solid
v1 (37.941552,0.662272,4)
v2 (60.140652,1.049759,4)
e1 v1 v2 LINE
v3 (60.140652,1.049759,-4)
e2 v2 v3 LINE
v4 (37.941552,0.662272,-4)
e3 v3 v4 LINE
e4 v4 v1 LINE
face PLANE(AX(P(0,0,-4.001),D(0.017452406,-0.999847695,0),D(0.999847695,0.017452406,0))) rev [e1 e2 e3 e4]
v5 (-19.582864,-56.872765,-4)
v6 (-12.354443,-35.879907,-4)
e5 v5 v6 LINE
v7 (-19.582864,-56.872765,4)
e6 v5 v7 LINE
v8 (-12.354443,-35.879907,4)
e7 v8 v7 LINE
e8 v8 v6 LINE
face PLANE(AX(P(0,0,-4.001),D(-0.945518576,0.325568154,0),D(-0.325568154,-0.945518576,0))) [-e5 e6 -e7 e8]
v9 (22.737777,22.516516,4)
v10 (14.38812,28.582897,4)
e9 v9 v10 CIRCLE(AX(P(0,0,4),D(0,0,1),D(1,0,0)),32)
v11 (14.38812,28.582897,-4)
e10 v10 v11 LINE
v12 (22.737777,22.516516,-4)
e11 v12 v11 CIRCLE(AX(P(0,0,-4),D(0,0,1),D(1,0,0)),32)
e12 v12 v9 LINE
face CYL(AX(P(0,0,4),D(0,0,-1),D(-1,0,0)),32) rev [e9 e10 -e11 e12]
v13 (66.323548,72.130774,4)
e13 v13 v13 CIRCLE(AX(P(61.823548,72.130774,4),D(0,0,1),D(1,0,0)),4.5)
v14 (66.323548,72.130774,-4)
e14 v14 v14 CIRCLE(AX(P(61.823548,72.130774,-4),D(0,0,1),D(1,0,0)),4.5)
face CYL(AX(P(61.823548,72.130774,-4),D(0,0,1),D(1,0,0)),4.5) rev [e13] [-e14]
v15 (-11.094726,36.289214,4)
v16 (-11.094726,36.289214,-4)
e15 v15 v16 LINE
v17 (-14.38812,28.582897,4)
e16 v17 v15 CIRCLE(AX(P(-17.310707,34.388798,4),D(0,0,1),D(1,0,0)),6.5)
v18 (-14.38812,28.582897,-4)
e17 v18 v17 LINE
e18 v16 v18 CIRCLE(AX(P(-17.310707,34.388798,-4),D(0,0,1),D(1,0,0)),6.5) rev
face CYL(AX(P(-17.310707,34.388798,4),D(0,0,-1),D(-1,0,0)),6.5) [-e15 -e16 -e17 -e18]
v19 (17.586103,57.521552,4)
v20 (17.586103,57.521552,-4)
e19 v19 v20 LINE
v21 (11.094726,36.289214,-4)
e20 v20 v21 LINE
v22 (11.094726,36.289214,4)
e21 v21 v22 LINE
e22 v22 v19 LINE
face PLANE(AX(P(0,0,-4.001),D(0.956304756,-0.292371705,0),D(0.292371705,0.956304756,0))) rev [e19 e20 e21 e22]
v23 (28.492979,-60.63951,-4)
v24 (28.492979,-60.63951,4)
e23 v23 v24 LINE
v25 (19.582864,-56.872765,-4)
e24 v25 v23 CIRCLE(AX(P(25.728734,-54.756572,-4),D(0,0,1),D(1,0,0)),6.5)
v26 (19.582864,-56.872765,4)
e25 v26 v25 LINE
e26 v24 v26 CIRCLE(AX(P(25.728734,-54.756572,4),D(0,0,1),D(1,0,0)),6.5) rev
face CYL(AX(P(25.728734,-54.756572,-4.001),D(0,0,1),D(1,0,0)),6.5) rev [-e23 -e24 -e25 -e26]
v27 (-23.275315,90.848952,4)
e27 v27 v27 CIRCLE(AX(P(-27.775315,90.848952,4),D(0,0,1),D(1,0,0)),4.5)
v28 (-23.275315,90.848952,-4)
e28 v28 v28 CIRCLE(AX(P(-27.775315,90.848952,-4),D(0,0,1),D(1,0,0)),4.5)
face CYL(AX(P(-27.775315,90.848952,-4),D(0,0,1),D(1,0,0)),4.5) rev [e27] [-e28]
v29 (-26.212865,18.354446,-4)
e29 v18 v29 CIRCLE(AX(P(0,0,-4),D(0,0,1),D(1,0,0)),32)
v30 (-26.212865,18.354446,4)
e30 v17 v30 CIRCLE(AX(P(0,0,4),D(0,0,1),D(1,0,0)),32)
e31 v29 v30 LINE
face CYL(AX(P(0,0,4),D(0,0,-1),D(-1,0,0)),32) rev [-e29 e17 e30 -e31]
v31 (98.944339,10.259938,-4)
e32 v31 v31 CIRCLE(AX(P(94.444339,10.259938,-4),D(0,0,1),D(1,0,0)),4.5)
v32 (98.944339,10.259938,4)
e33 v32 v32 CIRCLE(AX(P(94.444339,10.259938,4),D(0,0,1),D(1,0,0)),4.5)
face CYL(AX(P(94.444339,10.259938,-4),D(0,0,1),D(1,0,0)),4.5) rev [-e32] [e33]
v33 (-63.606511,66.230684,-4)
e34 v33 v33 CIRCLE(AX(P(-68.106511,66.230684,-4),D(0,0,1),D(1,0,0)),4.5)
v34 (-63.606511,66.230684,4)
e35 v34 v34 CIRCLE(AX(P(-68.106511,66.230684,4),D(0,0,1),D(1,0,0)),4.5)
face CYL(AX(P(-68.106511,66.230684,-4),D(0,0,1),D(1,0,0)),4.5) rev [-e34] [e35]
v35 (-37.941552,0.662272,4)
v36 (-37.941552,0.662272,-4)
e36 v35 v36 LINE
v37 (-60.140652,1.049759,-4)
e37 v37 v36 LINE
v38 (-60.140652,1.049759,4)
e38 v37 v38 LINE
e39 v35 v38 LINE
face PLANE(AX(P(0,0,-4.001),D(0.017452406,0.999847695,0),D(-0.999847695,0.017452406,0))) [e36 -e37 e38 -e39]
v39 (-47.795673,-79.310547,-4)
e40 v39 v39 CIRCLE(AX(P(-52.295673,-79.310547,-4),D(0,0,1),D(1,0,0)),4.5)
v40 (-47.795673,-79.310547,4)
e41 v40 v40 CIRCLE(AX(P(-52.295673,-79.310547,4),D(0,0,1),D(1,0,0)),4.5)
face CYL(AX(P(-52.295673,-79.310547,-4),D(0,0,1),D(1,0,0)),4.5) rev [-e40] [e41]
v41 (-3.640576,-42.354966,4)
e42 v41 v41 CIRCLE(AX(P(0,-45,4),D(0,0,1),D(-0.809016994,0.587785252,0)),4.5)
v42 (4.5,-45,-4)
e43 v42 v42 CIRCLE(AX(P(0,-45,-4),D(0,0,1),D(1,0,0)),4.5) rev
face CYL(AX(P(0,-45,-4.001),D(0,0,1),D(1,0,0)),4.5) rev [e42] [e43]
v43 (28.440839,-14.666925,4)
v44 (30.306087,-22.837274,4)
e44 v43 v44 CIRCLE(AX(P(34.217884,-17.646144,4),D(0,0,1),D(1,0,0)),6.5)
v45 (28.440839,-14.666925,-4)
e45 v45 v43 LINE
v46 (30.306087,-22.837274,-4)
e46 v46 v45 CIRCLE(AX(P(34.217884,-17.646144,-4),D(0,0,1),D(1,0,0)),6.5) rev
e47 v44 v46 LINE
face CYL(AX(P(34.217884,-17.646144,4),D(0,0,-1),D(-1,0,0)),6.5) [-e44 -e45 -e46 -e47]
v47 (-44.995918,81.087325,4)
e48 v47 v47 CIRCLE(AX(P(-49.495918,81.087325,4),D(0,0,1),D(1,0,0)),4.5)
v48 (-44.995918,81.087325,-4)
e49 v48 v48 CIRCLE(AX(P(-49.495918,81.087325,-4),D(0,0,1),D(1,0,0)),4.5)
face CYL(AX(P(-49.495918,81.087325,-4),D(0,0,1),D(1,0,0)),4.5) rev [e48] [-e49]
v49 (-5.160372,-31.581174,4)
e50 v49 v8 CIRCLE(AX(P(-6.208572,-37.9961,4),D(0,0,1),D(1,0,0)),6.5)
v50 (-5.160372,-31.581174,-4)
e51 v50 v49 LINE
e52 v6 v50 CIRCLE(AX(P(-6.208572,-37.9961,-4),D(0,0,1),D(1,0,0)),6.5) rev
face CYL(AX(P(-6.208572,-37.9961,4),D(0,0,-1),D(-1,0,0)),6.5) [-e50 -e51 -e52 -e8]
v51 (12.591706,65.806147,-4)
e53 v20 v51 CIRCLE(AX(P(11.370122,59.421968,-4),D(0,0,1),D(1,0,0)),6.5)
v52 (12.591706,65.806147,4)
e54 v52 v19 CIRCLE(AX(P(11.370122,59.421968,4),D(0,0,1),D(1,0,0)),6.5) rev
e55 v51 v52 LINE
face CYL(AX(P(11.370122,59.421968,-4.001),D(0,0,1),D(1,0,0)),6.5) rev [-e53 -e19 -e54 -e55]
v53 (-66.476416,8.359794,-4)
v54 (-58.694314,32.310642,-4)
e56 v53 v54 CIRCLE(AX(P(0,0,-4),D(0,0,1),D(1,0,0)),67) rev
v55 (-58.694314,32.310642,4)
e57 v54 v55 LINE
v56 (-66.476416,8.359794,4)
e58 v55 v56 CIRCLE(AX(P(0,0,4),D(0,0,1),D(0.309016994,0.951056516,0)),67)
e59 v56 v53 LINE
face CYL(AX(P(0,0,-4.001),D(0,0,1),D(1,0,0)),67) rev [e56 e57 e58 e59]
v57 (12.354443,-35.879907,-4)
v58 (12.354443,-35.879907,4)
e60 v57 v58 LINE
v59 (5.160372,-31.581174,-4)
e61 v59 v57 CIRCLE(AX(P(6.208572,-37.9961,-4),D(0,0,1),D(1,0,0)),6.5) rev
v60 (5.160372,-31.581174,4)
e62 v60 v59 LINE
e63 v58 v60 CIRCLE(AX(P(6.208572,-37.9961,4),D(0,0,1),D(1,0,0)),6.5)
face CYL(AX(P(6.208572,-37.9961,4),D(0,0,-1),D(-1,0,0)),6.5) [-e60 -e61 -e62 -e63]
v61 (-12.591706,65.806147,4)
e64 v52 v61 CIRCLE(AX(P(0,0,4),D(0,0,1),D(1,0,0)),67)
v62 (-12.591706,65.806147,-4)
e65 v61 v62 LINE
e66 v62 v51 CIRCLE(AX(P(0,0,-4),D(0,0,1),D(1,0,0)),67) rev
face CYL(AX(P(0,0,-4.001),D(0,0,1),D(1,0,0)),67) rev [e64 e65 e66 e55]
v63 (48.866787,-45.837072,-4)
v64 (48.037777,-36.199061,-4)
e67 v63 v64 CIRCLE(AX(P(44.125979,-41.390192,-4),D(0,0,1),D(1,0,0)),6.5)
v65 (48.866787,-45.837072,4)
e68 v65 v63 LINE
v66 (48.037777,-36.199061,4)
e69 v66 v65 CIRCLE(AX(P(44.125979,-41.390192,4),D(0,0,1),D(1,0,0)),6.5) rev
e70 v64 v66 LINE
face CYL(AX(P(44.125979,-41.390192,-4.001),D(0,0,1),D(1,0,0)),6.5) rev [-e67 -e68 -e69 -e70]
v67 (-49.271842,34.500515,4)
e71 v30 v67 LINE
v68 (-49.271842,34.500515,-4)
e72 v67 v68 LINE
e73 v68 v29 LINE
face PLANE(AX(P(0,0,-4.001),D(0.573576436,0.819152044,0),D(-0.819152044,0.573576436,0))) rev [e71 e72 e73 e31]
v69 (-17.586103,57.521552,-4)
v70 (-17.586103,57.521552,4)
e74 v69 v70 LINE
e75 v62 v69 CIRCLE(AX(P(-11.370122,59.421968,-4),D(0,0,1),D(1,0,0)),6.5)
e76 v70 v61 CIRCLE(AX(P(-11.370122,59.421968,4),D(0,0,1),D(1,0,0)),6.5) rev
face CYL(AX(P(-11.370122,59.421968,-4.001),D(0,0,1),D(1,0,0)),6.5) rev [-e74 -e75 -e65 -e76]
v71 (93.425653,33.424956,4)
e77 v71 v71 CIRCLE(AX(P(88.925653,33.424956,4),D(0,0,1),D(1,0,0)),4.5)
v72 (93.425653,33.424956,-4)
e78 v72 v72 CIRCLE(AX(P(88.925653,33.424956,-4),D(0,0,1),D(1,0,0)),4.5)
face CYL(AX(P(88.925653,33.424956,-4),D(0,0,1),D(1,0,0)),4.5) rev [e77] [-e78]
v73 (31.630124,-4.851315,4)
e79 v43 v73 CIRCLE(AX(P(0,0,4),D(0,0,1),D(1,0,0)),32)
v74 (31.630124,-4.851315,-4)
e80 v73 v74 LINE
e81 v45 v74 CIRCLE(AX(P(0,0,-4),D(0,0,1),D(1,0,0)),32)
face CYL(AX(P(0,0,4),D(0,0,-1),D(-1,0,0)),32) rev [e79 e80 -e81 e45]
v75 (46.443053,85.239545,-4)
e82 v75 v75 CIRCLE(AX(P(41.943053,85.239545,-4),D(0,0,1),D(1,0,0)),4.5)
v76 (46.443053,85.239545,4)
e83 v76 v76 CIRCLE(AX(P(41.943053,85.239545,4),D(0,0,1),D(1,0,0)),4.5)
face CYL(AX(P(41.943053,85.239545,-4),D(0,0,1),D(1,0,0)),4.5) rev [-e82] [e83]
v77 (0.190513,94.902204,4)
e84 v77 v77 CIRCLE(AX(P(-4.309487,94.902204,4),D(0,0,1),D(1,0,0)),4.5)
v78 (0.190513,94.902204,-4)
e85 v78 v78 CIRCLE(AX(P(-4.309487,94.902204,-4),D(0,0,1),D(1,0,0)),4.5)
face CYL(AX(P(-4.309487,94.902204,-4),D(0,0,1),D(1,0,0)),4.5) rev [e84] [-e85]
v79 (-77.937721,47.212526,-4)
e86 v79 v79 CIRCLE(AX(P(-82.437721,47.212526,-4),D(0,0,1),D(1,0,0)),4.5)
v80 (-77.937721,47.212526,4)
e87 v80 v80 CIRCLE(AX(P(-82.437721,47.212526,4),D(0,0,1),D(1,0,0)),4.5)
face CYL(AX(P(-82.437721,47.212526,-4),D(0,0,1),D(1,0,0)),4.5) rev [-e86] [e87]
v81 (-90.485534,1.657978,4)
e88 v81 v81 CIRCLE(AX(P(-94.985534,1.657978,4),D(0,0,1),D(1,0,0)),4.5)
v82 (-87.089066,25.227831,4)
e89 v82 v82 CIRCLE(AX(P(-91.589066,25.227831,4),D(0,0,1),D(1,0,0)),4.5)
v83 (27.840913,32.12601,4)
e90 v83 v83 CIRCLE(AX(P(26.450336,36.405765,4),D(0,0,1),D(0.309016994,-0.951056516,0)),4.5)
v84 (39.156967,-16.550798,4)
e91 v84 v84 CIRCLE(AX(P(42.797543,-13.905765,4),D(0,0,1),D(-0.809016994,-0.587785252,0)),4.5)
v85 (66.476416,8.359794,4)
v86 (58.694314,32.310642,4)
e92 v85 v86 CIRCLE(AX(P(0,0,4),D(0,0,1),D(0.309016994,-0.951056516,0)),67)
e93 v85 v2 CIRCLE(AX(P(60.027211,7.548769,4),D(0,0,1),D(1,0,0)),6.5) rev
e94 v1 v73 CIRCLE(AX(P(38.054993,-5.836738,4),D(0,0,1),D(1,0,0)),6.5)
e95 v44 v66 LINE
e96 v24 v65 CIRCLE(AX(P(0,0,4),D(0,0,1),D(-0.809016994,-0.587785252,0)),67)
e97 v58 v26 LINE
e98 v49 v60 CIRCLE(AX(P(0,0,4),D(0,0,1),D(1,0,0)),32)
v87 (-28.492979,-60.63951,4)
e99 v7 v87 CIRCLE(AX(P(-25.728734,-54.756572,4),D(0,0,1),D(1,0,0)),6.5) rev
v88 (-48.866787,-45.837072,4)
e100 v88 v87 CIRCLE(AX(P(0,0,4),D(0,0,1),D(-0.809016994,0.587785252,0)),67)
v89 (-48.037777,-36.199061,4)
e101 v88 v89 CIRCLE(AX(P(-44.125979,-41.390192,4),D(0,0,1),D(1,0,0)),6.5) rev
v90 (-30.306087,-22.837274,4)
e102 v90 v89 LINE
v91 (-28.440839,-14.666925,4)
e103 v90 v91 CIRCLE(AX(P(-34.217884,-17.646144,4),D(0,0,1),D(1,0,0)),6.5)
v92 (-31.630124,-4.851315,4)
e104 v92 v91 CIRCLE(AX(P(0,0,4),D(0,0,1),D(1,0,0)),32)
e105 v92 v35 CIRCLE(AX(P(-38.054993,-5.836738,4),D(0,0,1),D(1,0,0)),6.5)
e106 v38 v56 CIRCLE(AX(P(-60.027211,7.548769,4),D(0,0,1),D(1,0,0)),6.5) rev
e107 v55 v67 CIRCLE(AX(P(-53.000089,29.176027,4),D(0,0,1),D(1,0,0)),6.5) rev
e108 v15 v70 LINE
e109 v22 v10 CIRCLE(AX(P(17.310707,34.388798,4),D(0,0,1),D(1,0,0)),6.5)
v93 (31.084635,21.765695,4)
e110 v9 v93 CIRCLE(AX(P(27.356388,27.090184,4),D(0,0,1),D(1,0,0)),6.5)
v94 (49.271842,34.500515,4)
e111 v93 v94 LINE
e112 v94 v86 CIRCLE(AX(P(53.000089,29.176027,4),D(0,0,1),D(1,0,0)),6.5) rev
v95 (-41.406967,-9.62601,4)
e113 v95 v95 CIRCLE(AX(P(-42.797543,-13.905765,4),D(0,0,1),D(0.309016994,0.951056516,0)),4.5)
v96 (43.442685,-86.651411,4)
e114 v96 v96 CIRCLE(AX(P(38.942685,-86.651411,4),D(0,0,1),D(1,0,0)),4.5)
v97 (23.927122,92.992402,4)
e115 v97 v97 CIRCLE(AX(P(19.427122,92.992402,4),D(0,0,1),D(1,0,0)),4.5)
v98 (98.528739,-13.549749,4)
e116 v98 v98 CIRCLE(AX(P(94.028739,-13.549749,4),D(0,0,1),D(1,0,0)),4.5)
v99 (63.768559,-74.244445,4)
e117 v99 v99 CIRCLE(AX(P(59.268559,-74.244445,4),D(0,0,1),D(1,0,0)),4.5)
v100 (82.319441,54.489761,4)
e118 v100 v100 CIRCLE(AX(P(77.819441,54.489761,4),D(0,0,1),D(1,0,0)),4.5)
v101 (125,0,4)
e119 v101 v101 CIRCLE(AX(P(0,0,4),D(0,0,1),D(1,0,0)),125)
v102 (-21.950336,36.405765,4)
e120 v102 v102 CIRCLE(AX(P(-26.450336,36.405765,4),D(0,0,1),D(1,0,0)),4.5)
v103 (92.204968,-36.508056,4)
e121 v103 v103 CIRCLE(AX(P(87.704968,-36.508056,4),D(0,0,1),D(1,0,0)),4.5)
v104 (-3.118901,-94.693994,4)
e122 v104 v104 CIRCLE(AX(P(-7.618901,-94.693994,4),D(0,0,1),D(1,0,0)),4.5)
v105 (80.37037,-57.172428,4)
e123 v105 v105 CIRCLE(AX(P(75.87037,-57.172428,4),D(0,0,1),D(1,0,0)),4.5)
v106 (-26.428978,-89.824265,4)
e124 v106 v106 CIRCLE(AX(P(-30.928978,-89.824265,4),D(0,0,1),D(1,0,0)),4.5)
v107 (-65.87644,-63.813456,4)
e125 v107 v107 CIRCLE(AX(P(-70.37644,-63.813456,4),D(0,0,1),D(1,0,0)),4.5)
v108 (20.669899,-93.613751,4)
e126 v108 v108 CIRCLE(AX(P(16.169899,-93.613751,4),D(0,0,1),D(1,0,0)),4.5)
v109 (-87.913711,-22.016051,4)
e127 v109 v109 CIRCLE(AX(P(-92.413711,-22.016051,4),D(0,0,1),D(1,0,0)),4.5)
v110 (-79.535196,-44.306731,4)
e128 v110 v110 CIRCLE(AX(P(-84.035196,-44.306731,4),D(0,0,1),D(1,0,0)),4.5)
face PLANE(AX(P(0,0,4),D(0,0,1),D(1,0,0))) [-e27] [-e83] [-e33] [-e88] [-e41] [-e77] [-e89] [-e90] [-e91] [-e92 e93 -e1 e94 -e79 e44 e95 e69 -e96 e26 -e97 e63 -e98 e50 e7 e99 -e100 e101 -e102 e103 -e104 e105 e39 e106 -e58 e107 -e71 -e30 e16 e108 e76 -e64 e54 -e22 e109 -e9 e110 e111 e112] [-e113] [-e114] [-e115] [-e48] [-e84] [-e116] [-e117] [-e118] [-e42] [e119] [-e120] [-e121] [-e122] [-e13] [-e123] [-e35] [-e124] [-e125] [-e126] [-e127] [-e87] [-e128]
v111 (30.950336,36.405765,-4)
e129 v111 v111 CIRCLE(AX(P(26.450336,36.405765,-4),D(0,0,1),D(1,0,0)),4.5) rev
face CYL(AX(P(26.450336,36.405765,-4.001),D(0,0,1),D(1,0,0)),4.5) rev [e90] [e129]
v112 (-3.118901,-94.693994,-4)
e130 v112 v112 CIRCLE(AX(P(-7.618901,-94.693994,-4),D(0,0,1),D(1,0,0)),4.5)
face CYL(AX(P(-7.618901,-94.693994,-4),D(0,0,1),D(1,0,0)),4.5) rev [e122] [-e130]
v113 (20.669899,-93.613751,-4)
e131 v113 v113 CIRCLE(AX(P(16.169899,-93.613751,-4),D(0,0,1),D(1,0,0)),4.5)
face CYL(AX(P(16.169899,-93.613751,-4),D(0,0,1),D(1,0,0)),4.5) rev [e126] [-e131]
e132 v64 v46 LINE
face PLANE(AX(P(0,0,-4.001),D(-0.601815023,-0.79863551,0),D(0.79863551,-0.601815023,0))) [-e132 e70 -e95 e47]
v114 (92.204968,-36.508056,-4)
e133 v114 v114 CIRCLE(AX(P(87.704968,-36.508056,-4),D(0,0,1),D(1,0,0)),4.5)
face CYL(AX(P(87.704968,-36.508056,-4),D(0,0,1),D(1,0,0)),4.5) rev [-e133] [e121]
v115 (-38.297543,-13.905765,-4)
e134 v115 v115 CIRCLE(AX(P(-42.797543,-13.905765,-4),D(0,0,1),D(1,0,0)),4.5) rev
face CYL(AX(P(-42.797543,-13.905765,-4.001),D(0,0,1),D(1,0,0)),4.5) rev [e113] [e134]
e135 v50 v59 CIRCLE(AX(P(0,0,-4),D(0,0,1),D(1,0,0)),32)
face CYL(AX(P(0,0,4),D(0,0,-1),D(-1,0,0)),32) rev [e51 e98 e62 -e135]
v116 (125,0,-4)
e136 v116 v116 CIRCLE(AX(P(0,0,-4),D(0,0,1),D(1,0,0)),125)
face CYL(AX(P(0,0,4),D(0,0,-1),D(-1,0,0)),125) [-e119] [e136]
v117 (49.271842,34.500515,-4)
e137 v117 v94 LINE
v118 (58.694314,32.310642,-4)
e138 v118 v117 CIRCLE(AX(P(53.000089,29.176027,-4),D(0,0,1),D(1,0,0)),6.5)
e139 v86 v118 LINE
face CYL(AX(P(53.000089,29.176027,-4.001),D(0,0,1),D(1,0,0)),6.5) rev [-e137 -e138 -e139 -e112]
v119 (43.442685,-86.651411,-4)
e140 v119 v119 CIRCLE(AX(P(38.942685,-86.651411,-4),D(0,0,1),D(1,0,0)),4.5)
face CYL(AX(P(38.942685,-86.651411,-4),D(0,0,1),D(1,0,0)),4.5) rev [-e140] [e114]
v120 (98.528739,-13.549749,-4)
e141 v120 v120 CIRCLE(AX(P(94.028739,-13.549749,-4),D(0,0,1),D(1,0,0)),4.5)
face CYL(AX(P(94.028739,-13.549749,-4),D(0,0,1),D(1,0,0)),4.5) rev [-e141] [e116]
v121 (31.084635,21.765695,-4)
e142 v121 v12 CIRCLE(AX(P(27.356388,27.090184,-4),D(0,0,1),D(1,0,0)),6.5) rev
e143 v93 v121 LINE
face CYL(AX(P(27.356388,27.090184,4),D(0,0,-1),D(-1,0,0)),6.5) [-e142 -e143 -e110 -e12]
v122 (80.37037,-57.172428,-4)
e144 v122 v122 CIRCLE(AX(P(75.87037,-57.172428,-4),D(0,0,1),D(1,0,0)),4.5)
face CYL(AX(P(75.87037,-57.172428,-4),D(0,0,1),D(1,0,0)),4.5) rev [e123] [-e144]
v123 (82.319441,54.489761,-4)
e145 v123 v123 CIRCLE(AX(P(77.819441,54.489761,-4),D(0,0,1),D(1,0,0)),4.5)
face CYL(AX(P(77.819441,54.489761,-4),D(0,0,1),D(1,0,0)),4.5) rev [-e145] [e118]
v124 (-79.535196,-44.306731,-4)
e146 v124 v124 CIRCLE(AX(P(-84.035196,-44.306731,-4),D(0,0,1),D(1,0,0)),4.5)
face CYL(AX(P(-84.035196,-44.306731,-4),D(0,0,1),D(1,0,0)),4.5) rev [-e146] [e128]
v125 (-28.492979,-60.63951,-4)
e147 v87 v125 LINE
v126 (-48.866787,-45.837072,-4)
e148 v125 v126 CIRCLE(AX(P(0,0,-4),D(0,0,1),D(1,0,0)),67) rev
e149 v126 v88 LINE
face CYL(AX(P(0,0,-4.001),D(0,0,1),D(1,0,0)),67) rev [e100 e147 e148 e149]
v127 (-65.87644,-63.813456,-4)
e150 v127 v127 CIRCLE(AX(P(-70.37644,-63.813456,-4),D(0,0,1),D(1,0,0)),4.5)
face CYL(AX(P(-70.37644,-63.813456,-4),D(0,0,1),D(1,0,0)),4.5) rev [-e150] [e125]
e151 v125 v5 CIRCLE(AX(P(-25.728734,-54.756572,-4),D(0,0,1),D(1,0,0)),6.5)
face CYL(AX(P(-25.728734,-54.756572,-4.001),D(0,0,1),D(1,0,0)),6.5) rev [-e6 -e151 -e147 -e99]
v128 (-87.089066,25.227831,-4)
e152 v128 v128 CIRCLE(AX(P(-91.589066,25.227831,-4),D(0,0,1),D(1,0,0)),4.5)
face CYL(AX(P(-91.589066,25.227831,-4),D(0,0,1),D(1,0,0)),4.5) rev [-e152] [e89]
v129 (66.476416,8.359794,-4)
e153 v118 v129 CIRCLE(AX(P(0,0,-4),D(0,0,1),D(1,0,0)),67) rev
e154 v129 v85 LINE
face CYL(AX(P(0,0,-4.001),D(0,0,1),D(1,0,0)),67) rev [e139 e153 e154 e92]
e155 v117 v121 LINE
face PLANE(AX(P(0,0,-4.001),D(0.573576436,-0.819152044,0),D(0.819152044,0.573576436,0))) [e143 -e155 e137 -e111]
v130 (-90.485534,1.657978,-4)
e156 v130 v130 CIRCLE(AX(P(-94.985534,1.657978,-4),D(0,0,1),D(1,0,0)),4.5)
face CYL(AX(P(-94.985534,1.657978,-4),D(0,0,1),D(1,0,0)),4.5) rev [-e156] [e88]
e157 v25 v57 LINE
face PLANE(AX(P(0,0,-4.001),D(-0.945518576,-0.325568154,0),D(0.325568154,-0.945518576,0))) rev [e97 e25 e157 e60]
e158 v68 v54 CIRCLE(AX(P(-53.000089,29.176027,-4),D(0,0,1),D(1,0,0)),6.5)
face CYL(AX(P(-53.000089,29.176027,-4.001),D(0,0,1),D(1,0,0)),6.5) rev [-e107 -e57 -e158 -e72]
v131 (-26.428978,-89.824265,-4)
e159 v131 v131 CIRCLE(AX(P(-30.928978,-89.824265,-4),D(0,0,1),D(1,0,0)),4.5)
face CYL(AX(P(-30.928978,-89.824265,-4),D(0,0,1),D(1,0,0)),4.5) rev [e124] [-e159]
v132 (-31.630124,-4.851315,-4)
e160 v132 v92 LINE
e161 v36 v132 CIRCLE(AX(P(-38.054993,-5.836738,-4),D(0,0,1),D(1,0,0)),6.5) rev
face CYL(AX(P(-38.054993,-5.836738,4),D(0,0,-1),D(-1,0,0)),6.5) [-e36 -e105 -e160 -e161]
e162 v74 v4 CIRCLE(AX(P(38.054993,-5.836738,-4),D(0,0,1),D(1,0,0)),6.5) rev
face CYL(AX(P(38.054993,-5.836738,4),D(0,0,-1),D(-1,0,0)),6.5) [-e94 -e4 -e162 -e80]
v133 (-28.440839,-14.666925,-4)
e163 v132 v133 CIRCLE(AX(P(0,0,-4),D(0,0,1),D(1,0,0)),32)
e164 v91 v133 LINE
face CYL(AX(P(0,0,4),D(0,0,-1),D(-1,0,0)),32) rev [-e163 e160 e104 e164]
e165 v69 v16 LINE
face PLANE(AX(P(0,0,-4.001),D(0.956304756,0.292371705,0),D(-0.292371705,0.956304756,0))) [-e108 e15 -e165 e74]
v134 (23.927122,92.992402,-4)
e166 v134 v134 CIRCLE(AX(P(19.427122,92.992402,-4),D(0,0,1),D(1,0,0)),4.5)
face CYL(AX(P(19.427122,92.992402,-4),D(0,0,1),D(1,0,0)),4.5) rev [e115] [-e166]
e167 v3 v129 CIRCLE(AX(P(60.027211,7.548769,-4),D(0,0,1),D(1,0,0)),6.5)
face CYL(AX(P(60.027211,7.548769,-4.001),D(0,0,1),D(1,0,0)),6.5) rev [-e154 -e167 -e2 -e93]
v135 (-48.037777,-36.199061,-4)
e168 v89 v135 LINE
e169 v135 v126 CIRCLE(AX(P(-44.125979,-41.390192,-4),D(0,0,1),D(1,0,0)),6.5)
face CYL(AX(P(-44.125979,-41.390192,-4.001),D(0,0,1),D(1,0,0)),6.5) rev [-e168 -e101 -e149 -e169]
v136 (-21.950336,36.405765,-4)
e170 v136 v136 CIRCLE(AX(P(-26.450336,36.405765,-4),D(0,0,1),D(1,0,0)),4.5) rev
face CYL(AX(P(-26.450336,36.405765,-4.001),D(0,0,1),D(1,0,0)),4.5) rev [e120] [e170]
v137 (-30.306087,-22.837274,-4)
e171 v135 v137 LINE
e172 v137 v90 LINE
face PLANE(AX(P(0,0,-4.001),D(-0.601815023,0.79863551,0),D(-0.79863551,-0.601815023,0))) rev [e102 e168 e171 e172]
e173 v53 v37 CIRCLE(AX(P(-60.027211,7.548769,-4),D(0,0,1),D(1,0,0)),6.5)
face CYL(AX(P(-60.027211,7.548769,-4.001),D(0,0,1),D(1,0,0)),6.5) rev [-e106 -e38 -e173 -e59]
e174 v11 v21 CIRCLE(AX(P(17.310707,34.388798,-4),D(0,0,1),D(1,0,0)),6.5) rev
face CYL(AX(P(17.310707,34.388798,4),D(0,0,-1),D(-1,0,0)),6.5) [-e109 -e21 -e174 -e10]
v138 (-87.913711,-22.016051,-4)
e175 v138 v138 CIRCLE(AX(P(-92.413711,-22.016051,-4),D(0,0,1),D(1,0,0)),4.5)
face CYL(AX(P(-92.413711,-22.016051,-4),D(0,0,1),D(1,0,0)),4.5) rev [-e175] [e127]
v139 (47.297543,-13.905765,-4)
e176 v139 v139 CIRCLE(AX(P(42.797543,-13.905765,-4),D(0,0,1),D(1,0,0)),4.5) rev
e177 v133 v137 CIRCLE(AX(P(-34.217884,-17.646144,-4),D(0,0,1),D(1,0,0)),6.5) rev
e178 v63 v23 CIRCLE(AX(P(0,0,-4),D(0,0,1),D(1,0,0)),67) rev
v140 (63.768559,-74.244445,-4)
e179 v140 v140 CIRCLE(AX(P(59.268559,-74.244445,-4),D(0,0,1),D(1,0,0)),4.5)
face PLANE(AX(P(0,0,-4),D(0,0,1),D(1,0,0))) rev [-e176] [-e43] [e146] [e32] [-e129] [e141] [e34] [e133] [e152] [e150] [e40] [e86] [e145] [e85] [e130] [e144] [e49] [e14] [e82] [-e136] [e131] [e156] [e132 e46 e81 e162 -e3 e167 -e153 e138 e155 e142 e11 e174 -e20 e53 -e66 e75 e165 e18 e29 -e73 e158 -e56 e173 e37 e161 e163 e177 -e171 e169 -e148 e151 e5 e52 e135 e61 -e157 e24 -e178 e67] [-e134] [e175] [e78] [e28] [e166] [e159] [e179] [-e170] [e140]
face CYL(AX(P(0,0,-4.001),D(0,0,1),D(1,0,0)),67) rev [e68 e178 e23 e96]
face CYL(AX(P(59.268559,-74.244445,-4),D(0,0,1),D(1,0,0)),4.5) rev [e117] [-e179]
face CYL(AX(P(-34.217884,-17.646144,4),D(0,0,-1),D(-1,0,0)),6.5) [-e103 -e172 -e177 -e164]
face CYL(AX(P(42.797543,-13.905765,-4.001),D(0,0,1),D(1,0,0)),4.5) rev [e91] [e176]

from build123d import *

# Parameters (mm, degrees)
SKETCH5_R               = 125
SKETCH5_R_2             = 32
BOSS_EXTRUDE2_DEPTH     = 4
CUT_EXTRUDE1_REACH      = 178.958
SKETCH7_R               = 4.5
CIRPATTERN1_COUNT       = 5
FILL_START              = -4
FILL_PATTERN1_OUTLINE_R = 4.5
FILL_PATTERN1_DEPTH     = 8
FILLET1_R               = 6.5


# Read off the part's stored shape, not the designer's step: Fill Pattern1
with BuildPart() as part:
    # Sketch5 → Boss-Extrude2 (new, symmetric)
    with BuildSketch(Plane.XY):
        Circle(SKETCH5_R)
        Circle(SKETCH5_R_2, mode=Mode.SUBTRACT)
    extrude(amount=BOSS_EXTRUDE2_DEPTH, both=True)

    # Sketch7 → Cut-Extrude1 (cut, up to next)
    with BuildSketch(Plane.XY.offset(4), mode=Mode.PRIVATE) as cut_extrude1_sk1:
        with BuildLine():
            ThreePointArc((-9.355894551, 30.601752191), (0, 32), (9.355894551, 30.601752191))
            Line((9.355894551, 30.601752191), (19.588904216, 64.07241865))
            ThreePointArc((19.588904216, 64.07241865), (0, 67), (-19.588904216, 64.07241865))
            Line((-19.588904216, 64.07241865), (-9.355894551, 30.601752191))
        make_face()
    cut_extrude1_tool1 = extrude(cut_extrude1_sk1.sketch, amount=-CUT_EXTRUDE1_REACH, mode=Mode.PRIVATE) & part.part
    # Sketch7 → Cut-Extrude1 (cut, up to next)
    with BuildSketch(Plane.XY.offset(4), mode=Mode.PRIVATE) as cut_extrude1_sk2:
        with Locations((-26.450336353, 36.405764747)):
            Circle(SKETCH7_R)
    cut_extrude1_tool2 = extrude(cut_extrude1_sk2.sketch, amount=-CUT_EXTRUDE1_REACH, mode=Mode.PRIVATE) & part.part
    cut_extrude1_1 = cut_extrude1_tool1.solids().sort_by_distance((0, 50.80907, 4))[0]
    add(cut_extrude1_1, mode=Mode.SUBTRACT)
    cut_extrude1_2 = cut_extrude1_tool2.solids().sort_by_distance((-26.450336, 36.405765, 4))[0]
    add(cut_extrude1_2, mode=Mode.SUBTRACT)
    cut_extrude1 = cut_extrude1_1 + cut_extrude1_2  # Cut-Extrude1 as one shape, for the pattern or mirror that repeats it

    # CirPattern1: Cut-Extrude1 ×5 about axis
    cirpattern1_axis = Axis((0, 0, 0), (0, 0, 1))
    for i in range(1, CIRPATTERN1_COUNT):
        add(cut_extrude1.rotate(cirpattern1_axis, i * 360 / CIRPATTERN1_COUNT), mode=Mode.SUBTRACT)

    # Fill Pattern1 outline → Fill Pattern1 (cut)
    with BuildSketch(Plane.XY.offset(FILL_START)):
        with Locations((-94.985534108, 1.657978305)):
            Circle(FILL_PATTERN1_OUTLINE_R)
        with Locations((-92.413711498, -22.016051139)):
            Circle(FILL_PATTERN1_OUTLINE_R)
        with Locations((-84.035195714, -44.306731139)):
            Circle(FILL_PATTERN1_OUTLINE_R)
        with Locations((-70.376439715, -63.813456292)):
            Circle(FILL_PATTERN1_OUTLINE_R)
        with Locations((-52.295673376, -79.310547317)):
            Circle(FILL_PATTERN1_OUTLINE_R)
        with Locations((-30.928977742, -89.824264989)):
            Circle(FILL_PATTERN1_OUTLINE_R)
        with Locations((-7.618900879, -94.69399376)):
            Circle(FILL_PATTERN1_OUTLINE_R)
        with Locations((16.169899353, -93.613750663)):
            Circle(FILL_PATTERN1_OUTLINE_R)
        with Locations((38.942685147, -86.651411343)):
            Circle(FILL_PATTERN1_OUTLINE_R)
        with Locations((59.268558619, -74.244445187)):
            Circle(FILL_PATTERN1_OUTLINE_R)
        with Locations((75.870370386, -57.172427506)):
            Circle(FILL_PATTERN1_OUTLINE_R)
        with Locations((87.704967558, -36.508055959)):
            Circle(FILL_PATTERN1_OUTLINE_R)
        with Locations((94.028738868, -13.549749009)):
            Circle(FILL_PATTERN1_OUTLINE_R)
        with Locations((94.444338509, 10.259938485)):
            Circle(FILL_PATTERN1_OUTLINE_R)
        with Locations((88.925652827, 33.424956292)):
            Circle(FILL_PATTERN1_OUTLINE_R)
        with Locations((77.819441139, 54.489761147)):
            Circle(FILL_PATTERN1_OUTLINE_R)
        with Locations((61.823547572, 72.13077389)):
            Circle(FILL_PATTERN1_OUTLINE_R)
        with Locations((41.943052947, 85.239544812)):
            Circle(FILL_PATTERN1_OUTLINE_R)
        with Locations((19.427121857, 92.992401626)):
            Circle(FILL_PATTERN1_OUTLINE_R)
        with Locations((-4.30948694, 94.902203823)):
            Circle(FILL_PATTERN1_OUTLINE_R)
        with Locations((-27.775315017, 90.84895151)):
            Circle(FILL_PATTERN1_OUTLINE_R)
        with Locations((-49.495918093, 81.087325434)):
            Circle(FILL_PATTERN1_OUTLINE_R)
        with Locations((-68.106510795, 66.230684464)):
            Circle(FILL_PATTERN1_OUTLINE_R)
        with Locations((-82.437721138, 47.212525991)):
            Circle(FILL_PATTERN1_OUTLINE_R)
        with Locations((-91.58906647, 25.227830854)):
            Circle(FILL_PATTERN1_OUTLINE_R)
    extrude(amount=FILL_PATTERN1_DEPTH, mode=Mode.SUBTRACT)

    # Fillet1
    fillet1_edges = [part.edges().sort_by_distance(p)[0] for p in [
        (19.588904216, 64.07241865, 0),
        (9.355894551, 30.601752191, 0),
        (-9.355894551, 30.601752191, 0),
        (-19.588904216, 64.07241865, 0),
        (-53.508579173, -40.321606551, 0),
        (-25.556336322, -19.258080741, 0),
        (-10.418180943, -30.256594419, 0),
        (-21.813066349, -63.349744565, 0),
        (21.813066349, -63.349744565, 0),
        (10.418180943, -30.256594419, 0),
        (25.556336322, -19.258080741, 0),
        (53.508579173, -40.321606551, 0),
        (66.989795575, 1.169311231, 0),
        (31.995126245, 0.558477006, 0),
        (26.212865417, 18.354445963, 0),
        (54.883186967, 38.429621236, 0),
        (-54.883186967, 38.429621236, 0),
        (-31.995126245, 0.558477006, 0),
        (-66.989795575, 1.169311231, 0),
    ]]
    fillet(fillet1_edges, radius=FILLET1_R)


solid = part.part
